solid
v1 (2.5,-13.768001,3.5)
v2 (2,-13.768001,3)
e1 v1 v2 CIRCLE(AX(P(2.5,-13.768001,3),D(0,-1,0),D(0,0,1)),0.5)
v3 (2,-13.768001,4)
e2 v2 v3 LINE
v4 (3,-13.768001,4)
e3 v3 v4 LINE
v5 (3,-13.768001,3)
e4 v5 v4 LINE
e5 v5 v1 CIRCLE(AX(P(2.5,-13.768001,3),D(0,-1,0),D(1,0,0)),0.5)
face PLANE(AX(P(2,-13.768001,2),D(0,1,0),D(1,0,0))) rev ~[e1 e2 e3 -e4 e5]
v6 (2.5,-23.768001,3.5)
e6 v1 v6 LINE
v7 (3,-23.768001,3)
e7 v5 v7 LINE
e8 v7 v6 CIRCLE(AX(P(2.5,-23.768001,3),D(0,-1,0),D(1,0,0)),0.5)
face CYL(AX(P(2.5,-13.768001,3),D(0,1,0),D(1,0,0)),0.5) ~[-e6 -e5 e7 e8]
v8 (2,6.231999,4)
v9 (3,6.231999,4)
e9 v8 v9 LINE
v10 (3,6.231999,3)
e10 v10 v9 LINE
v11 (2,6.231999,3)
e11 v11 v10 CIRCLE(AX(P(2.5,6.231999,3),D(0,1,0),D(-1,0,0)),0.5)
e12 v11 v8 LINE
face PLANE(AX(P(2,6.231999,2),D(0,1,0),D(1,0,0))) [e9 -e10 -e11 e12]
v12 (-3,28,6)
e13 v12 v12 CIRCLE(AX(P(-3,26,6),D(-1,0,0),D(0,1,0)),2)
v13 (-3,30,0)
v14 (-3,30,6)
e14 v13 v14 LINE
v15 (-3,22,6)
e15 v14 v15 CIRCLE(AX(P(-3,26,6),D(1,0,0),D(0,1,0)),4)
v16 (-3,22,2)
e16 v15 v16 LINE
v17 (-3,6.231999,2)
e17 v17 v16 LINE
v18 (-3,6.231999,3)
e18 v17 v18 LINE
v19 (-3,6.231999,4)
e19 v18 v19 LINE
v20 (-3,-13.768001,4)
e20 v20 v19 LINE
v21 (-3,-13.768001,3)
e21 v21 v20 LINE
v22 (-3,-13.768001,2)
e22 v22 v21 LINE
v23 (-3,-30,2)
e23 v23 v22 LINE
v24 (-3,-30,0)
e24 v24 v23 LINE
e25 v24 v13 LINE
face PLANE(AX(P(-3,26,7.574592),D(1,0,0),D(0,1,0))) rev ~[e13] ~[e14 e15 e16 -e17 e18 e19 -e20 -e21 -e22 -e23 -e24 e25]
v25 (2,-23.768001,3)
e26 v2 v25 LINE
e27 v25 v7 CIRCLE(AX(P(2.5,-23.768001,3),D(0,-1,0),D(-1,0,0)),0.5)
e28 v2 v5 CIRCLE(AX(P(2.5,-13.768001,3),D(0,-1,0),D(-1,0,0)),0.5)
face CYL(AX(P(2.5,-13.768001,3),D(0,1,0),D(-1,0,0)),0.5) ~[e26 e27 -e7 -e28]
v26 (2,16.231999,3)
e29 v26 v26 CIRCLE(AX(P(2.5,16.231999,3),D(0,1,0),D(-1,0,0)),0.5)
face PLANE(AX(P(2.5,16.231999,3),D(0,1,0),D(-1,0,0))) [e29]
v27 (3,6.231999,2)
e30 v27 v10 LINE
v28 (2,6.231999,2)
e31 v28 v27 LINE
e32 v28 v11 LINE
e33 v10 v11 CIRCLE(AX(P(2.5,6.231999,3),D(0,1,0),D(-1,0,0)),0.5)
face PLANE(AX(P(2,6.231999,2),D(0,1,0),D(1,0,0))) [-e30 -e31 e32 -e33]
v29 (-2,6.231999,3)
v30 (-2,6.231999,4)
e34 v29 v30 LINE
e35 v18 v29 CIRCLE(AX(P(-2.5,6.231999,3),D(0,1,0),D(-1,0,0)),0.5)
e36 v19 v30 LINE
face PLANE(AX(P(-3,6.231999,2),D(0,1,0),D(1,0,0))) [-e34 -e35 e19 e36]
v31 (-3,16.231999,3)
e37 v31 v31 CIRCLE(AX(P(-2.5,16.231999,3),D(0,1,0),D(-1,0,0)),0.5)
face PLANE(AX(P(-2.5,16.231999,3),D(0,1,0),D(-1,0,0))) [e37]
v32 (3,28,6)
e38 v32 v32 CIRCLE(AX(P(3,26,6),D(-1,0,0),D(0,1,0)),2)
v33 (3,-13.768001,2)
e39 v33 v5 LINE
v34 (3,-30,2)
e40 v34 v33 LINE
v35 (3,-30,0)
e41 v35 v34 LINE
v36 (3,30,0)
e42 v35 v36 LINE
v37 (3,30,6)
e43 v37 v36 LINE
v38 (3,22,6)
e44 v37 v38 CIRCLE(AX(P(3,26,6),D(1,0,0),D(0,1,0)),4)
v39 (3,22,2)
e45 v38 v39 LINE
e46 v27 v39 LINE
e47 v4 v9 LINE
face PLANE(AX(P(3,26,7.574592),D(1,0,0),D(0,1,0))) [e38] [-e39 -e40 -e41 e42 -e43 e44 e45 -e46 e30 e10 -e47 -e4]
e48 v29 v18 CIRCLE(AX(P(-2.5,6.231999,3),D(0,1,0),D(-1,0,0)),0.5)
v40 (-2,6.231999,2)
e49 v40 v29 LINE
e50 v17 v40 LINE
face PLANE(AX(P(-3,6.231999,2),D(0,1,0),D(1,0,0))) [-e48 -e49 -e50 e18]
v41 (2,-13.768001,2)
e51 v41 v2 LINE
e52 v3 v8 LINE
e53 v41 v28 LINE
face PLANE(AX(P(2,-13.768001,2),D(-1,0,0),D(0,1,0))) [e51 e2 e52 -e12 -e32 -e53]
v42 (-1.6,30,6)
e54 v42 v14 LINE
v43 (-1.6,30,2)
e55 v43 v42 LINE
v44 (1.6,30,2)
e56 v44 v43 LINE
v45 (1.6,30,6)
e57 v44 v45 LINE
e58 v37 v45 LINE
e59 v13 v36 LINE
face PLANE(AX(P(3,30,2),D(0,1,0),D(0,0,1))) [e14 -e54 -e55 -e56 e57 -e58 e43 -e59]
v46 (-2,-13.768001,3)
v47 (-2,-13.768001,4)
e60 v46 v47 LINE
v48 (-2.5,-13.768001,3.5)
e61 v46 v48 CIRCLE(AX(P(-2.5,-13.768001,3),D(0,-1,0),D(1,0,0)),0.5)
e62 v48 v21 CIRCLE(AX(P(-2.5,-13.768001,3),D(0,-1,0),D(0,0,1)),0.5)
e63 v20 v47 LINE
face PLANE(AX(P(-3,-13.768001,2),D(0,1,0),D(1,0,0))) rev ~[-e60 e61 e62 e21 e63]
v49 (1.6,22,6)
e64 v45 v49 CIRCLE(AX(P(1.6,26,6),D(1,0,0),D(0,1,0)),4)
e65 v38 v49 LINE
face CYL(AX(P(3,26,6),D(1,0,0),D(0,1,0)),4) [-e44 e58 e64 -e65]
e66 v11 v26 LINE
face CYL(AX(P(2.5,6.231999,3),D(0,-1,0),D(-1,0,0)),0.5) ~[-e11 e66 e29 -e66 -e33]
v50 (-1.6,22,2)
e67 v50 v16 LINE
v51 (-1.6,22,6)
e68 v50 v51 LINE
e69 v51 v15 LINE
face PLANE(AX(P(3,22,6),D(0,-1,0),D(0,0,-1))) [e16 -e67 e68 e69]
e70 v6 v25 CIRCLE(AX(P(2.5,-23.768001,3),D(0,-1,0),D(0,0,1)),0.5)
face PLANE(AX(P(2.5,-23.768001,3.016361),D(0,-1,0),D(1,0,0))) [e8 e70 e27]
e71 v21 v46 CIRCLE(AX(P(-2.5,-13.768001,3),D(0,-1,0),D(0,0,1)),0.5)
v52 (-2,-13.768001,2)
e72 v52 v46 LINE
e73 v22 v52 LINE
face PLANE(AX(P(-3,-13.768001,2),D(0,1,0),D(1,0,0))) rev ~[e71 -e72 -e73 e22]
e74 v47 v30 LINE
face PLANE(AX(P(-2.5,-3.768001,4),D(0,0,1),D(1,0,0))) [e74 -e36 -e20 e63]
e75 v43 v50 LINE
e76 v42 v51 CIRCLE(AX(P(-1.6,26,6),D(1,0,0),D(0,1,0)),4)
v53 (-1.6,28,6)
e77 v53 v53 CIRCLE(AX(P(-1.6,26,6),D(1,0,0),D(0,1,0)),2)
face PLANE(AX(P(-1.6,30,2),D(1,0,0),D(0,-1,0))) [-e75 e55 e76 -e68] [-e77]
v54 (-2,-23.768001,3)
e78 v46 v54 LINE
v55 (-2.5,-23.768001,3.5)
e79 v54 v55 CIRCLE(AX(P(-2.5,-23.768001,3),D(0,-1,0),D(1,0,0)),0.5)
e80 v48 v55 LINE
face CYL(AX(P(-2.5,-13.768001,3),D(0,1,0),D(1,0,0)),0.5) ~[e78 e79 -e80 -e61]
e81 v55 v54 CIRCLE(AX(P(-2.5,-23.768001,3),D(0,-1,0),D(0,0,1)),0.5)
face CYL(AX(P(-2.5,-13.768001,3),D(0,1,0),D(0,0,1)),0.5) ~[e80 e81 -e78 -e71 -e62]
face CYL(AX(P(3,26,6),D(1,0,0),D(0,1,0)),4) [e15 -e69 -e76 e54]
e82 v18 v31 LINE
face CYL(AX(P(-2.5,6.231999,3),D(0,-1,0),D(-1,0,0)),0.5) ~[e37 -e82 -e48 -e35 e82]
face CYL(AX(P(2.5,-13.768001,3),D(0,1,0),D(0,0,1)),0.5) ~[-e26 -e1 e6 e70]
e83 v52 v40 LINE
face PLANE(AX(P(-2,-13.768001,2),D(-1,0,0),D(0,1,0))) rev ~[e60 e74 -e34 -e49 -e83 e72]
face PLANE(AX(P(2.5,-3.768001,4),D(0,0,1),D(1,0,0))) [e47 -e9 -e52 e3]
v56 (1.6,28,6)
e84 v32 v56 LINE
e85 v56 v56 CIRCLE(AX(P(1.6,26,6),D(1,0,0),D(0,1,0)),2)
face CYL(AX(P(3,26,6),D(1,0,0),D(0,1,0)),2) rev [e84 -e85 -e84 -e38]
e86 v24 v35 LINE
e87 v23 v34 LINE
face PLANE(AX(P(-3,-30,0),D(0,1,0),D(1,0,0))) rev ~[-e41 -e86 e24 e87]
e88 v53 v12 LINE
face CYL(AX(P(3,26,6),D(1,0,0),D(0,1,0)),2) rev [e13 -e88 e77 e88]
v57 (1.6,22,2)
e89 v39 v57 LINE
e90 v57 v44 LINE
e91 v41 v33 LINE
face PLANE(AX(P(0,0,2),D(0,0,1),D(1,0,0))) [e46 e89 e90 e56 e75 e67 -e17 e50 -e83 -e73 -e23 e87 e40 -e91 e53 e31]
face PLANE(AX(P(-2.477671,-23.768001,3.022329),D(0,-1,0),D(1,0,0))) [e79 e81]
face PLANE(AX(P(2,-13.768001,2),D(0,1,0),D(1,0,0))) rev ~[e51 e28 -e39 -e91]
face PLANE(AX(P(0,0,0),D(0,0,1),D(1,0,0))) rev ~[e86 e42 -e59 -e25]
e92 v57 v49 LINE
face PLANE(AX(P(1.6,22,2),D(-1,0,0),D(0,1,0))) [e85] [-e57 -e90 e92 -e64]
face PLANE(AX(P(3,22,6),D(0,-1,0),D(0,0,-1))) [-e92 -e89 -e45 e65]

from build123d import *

# Parameters (mm, degrees)
F0_W      = 6
F0_H      = 60
F1_DEPTH  = 2
F3_DEPTH  = 6
F6_DEPTH  = 25
F4_W      = 1
F4_H      = 20
F7_DEPTH  = 2
F9_DEPTH  = 10
F10_R     = 0.5
F11_DEPTH = 10


# Not quite as in the source:
# - a feature of the source that left no trace in its solid (it failed there, or was rolled back) is left out
# - the program builds the solid bodies; features that only make, move or delete a surface that nothing else refers to are left out


with BuildPart() as f1:
    # F0 (on Top) → F1 (new body)
    with BuildSketch(Plane.XY):
        Rectangle(F0_W, F0_H)
    extrude(amount=F1_DEPTH)

    # F2 (on face) → F3 (join)
    with BuildSketch(Plane.YZ.offset(3)):
        with BuildLine():
            Line((28, 6), (30, 6))
            ThreePointArc((30, 6), (26, 10), (22, 6))
            Line((22, 6), (24, 6))
            ThreePointArc((24, 6), (26, 8), (28, 6))
        make_face()
        with BuildLine():
            Line((22, 2), (30, 2))
            Line((30, 2), (30, 6))
            Line((30, 6), (28, 6))
            ThreePointArc((28, 6), (26, 4), (24, 6))
            Line((24, 6), (22, 6))
            Line((22, 6), (22, 2))
        make_face()
    extrude(amount=-F3_DEPTH)

    # F5 (on face) → F6 (cut)
    with BuildSketch(Plane.XY.offset(2)):
        Polygon((1.6, 22), (1.6, 30), (0, 30), (-1.6, 30), (-1.6, 22), align=None)
    extrude(amount=F6_DEPTH, mode=Mode.SUBTRACT)

    # F4 (on face) → F7 (join)
    with BuildSketch(Plane.XY.offset(2)):
        with Locations((2.5, -3.7680014595)):
            Rectangle(F4_W, F4_H)
        with Locations((-2.5, -3.7680014595)):
            Rectangle(F4_W, F4_H)
    extrude(amount=F7_DEPTH)

    # F8 (on face) → F9 (join)
    with BuildSketch(Plane.XZ.offset(13.7680014595)):
        with BuildLine():
            ThreePointArc((2.5, 3.5), (2.1464466094, 3.3535533906), (2, 3))
            ThreePointArc((2, 3), (2.5, 2.5), (3, 3))
            ThreePointArc((3, 3), (2.8535533906, 3.3535533906), (2.5, 3.5))
        make_face()
        with BuildLine():
            ThreePointArc((-2.5, 3.5), (-2.8535533906, 2.6464466094), (-2, 3))
            ThreePointArc((-2, 3), (-2.1464466094, 3.3535533906), (-2.5, 3.5))
        make_face()
    extrude(amount=F9_DEPTH)

    # F10 (on face) → F11 (join)
    with BuildSketch(Plane(origin=(0, 6.2319985405, 0), x_dir=(-1, 0, 0), z_dir=(0, 1, 0))):
        with Locations((-2.5, 3)):
            Circle(F10_R)
        with Locations((2.5, 3)):
            Circle(F10_R)
    extrude(amount=F11_DEPTH)


solid = f1.part
